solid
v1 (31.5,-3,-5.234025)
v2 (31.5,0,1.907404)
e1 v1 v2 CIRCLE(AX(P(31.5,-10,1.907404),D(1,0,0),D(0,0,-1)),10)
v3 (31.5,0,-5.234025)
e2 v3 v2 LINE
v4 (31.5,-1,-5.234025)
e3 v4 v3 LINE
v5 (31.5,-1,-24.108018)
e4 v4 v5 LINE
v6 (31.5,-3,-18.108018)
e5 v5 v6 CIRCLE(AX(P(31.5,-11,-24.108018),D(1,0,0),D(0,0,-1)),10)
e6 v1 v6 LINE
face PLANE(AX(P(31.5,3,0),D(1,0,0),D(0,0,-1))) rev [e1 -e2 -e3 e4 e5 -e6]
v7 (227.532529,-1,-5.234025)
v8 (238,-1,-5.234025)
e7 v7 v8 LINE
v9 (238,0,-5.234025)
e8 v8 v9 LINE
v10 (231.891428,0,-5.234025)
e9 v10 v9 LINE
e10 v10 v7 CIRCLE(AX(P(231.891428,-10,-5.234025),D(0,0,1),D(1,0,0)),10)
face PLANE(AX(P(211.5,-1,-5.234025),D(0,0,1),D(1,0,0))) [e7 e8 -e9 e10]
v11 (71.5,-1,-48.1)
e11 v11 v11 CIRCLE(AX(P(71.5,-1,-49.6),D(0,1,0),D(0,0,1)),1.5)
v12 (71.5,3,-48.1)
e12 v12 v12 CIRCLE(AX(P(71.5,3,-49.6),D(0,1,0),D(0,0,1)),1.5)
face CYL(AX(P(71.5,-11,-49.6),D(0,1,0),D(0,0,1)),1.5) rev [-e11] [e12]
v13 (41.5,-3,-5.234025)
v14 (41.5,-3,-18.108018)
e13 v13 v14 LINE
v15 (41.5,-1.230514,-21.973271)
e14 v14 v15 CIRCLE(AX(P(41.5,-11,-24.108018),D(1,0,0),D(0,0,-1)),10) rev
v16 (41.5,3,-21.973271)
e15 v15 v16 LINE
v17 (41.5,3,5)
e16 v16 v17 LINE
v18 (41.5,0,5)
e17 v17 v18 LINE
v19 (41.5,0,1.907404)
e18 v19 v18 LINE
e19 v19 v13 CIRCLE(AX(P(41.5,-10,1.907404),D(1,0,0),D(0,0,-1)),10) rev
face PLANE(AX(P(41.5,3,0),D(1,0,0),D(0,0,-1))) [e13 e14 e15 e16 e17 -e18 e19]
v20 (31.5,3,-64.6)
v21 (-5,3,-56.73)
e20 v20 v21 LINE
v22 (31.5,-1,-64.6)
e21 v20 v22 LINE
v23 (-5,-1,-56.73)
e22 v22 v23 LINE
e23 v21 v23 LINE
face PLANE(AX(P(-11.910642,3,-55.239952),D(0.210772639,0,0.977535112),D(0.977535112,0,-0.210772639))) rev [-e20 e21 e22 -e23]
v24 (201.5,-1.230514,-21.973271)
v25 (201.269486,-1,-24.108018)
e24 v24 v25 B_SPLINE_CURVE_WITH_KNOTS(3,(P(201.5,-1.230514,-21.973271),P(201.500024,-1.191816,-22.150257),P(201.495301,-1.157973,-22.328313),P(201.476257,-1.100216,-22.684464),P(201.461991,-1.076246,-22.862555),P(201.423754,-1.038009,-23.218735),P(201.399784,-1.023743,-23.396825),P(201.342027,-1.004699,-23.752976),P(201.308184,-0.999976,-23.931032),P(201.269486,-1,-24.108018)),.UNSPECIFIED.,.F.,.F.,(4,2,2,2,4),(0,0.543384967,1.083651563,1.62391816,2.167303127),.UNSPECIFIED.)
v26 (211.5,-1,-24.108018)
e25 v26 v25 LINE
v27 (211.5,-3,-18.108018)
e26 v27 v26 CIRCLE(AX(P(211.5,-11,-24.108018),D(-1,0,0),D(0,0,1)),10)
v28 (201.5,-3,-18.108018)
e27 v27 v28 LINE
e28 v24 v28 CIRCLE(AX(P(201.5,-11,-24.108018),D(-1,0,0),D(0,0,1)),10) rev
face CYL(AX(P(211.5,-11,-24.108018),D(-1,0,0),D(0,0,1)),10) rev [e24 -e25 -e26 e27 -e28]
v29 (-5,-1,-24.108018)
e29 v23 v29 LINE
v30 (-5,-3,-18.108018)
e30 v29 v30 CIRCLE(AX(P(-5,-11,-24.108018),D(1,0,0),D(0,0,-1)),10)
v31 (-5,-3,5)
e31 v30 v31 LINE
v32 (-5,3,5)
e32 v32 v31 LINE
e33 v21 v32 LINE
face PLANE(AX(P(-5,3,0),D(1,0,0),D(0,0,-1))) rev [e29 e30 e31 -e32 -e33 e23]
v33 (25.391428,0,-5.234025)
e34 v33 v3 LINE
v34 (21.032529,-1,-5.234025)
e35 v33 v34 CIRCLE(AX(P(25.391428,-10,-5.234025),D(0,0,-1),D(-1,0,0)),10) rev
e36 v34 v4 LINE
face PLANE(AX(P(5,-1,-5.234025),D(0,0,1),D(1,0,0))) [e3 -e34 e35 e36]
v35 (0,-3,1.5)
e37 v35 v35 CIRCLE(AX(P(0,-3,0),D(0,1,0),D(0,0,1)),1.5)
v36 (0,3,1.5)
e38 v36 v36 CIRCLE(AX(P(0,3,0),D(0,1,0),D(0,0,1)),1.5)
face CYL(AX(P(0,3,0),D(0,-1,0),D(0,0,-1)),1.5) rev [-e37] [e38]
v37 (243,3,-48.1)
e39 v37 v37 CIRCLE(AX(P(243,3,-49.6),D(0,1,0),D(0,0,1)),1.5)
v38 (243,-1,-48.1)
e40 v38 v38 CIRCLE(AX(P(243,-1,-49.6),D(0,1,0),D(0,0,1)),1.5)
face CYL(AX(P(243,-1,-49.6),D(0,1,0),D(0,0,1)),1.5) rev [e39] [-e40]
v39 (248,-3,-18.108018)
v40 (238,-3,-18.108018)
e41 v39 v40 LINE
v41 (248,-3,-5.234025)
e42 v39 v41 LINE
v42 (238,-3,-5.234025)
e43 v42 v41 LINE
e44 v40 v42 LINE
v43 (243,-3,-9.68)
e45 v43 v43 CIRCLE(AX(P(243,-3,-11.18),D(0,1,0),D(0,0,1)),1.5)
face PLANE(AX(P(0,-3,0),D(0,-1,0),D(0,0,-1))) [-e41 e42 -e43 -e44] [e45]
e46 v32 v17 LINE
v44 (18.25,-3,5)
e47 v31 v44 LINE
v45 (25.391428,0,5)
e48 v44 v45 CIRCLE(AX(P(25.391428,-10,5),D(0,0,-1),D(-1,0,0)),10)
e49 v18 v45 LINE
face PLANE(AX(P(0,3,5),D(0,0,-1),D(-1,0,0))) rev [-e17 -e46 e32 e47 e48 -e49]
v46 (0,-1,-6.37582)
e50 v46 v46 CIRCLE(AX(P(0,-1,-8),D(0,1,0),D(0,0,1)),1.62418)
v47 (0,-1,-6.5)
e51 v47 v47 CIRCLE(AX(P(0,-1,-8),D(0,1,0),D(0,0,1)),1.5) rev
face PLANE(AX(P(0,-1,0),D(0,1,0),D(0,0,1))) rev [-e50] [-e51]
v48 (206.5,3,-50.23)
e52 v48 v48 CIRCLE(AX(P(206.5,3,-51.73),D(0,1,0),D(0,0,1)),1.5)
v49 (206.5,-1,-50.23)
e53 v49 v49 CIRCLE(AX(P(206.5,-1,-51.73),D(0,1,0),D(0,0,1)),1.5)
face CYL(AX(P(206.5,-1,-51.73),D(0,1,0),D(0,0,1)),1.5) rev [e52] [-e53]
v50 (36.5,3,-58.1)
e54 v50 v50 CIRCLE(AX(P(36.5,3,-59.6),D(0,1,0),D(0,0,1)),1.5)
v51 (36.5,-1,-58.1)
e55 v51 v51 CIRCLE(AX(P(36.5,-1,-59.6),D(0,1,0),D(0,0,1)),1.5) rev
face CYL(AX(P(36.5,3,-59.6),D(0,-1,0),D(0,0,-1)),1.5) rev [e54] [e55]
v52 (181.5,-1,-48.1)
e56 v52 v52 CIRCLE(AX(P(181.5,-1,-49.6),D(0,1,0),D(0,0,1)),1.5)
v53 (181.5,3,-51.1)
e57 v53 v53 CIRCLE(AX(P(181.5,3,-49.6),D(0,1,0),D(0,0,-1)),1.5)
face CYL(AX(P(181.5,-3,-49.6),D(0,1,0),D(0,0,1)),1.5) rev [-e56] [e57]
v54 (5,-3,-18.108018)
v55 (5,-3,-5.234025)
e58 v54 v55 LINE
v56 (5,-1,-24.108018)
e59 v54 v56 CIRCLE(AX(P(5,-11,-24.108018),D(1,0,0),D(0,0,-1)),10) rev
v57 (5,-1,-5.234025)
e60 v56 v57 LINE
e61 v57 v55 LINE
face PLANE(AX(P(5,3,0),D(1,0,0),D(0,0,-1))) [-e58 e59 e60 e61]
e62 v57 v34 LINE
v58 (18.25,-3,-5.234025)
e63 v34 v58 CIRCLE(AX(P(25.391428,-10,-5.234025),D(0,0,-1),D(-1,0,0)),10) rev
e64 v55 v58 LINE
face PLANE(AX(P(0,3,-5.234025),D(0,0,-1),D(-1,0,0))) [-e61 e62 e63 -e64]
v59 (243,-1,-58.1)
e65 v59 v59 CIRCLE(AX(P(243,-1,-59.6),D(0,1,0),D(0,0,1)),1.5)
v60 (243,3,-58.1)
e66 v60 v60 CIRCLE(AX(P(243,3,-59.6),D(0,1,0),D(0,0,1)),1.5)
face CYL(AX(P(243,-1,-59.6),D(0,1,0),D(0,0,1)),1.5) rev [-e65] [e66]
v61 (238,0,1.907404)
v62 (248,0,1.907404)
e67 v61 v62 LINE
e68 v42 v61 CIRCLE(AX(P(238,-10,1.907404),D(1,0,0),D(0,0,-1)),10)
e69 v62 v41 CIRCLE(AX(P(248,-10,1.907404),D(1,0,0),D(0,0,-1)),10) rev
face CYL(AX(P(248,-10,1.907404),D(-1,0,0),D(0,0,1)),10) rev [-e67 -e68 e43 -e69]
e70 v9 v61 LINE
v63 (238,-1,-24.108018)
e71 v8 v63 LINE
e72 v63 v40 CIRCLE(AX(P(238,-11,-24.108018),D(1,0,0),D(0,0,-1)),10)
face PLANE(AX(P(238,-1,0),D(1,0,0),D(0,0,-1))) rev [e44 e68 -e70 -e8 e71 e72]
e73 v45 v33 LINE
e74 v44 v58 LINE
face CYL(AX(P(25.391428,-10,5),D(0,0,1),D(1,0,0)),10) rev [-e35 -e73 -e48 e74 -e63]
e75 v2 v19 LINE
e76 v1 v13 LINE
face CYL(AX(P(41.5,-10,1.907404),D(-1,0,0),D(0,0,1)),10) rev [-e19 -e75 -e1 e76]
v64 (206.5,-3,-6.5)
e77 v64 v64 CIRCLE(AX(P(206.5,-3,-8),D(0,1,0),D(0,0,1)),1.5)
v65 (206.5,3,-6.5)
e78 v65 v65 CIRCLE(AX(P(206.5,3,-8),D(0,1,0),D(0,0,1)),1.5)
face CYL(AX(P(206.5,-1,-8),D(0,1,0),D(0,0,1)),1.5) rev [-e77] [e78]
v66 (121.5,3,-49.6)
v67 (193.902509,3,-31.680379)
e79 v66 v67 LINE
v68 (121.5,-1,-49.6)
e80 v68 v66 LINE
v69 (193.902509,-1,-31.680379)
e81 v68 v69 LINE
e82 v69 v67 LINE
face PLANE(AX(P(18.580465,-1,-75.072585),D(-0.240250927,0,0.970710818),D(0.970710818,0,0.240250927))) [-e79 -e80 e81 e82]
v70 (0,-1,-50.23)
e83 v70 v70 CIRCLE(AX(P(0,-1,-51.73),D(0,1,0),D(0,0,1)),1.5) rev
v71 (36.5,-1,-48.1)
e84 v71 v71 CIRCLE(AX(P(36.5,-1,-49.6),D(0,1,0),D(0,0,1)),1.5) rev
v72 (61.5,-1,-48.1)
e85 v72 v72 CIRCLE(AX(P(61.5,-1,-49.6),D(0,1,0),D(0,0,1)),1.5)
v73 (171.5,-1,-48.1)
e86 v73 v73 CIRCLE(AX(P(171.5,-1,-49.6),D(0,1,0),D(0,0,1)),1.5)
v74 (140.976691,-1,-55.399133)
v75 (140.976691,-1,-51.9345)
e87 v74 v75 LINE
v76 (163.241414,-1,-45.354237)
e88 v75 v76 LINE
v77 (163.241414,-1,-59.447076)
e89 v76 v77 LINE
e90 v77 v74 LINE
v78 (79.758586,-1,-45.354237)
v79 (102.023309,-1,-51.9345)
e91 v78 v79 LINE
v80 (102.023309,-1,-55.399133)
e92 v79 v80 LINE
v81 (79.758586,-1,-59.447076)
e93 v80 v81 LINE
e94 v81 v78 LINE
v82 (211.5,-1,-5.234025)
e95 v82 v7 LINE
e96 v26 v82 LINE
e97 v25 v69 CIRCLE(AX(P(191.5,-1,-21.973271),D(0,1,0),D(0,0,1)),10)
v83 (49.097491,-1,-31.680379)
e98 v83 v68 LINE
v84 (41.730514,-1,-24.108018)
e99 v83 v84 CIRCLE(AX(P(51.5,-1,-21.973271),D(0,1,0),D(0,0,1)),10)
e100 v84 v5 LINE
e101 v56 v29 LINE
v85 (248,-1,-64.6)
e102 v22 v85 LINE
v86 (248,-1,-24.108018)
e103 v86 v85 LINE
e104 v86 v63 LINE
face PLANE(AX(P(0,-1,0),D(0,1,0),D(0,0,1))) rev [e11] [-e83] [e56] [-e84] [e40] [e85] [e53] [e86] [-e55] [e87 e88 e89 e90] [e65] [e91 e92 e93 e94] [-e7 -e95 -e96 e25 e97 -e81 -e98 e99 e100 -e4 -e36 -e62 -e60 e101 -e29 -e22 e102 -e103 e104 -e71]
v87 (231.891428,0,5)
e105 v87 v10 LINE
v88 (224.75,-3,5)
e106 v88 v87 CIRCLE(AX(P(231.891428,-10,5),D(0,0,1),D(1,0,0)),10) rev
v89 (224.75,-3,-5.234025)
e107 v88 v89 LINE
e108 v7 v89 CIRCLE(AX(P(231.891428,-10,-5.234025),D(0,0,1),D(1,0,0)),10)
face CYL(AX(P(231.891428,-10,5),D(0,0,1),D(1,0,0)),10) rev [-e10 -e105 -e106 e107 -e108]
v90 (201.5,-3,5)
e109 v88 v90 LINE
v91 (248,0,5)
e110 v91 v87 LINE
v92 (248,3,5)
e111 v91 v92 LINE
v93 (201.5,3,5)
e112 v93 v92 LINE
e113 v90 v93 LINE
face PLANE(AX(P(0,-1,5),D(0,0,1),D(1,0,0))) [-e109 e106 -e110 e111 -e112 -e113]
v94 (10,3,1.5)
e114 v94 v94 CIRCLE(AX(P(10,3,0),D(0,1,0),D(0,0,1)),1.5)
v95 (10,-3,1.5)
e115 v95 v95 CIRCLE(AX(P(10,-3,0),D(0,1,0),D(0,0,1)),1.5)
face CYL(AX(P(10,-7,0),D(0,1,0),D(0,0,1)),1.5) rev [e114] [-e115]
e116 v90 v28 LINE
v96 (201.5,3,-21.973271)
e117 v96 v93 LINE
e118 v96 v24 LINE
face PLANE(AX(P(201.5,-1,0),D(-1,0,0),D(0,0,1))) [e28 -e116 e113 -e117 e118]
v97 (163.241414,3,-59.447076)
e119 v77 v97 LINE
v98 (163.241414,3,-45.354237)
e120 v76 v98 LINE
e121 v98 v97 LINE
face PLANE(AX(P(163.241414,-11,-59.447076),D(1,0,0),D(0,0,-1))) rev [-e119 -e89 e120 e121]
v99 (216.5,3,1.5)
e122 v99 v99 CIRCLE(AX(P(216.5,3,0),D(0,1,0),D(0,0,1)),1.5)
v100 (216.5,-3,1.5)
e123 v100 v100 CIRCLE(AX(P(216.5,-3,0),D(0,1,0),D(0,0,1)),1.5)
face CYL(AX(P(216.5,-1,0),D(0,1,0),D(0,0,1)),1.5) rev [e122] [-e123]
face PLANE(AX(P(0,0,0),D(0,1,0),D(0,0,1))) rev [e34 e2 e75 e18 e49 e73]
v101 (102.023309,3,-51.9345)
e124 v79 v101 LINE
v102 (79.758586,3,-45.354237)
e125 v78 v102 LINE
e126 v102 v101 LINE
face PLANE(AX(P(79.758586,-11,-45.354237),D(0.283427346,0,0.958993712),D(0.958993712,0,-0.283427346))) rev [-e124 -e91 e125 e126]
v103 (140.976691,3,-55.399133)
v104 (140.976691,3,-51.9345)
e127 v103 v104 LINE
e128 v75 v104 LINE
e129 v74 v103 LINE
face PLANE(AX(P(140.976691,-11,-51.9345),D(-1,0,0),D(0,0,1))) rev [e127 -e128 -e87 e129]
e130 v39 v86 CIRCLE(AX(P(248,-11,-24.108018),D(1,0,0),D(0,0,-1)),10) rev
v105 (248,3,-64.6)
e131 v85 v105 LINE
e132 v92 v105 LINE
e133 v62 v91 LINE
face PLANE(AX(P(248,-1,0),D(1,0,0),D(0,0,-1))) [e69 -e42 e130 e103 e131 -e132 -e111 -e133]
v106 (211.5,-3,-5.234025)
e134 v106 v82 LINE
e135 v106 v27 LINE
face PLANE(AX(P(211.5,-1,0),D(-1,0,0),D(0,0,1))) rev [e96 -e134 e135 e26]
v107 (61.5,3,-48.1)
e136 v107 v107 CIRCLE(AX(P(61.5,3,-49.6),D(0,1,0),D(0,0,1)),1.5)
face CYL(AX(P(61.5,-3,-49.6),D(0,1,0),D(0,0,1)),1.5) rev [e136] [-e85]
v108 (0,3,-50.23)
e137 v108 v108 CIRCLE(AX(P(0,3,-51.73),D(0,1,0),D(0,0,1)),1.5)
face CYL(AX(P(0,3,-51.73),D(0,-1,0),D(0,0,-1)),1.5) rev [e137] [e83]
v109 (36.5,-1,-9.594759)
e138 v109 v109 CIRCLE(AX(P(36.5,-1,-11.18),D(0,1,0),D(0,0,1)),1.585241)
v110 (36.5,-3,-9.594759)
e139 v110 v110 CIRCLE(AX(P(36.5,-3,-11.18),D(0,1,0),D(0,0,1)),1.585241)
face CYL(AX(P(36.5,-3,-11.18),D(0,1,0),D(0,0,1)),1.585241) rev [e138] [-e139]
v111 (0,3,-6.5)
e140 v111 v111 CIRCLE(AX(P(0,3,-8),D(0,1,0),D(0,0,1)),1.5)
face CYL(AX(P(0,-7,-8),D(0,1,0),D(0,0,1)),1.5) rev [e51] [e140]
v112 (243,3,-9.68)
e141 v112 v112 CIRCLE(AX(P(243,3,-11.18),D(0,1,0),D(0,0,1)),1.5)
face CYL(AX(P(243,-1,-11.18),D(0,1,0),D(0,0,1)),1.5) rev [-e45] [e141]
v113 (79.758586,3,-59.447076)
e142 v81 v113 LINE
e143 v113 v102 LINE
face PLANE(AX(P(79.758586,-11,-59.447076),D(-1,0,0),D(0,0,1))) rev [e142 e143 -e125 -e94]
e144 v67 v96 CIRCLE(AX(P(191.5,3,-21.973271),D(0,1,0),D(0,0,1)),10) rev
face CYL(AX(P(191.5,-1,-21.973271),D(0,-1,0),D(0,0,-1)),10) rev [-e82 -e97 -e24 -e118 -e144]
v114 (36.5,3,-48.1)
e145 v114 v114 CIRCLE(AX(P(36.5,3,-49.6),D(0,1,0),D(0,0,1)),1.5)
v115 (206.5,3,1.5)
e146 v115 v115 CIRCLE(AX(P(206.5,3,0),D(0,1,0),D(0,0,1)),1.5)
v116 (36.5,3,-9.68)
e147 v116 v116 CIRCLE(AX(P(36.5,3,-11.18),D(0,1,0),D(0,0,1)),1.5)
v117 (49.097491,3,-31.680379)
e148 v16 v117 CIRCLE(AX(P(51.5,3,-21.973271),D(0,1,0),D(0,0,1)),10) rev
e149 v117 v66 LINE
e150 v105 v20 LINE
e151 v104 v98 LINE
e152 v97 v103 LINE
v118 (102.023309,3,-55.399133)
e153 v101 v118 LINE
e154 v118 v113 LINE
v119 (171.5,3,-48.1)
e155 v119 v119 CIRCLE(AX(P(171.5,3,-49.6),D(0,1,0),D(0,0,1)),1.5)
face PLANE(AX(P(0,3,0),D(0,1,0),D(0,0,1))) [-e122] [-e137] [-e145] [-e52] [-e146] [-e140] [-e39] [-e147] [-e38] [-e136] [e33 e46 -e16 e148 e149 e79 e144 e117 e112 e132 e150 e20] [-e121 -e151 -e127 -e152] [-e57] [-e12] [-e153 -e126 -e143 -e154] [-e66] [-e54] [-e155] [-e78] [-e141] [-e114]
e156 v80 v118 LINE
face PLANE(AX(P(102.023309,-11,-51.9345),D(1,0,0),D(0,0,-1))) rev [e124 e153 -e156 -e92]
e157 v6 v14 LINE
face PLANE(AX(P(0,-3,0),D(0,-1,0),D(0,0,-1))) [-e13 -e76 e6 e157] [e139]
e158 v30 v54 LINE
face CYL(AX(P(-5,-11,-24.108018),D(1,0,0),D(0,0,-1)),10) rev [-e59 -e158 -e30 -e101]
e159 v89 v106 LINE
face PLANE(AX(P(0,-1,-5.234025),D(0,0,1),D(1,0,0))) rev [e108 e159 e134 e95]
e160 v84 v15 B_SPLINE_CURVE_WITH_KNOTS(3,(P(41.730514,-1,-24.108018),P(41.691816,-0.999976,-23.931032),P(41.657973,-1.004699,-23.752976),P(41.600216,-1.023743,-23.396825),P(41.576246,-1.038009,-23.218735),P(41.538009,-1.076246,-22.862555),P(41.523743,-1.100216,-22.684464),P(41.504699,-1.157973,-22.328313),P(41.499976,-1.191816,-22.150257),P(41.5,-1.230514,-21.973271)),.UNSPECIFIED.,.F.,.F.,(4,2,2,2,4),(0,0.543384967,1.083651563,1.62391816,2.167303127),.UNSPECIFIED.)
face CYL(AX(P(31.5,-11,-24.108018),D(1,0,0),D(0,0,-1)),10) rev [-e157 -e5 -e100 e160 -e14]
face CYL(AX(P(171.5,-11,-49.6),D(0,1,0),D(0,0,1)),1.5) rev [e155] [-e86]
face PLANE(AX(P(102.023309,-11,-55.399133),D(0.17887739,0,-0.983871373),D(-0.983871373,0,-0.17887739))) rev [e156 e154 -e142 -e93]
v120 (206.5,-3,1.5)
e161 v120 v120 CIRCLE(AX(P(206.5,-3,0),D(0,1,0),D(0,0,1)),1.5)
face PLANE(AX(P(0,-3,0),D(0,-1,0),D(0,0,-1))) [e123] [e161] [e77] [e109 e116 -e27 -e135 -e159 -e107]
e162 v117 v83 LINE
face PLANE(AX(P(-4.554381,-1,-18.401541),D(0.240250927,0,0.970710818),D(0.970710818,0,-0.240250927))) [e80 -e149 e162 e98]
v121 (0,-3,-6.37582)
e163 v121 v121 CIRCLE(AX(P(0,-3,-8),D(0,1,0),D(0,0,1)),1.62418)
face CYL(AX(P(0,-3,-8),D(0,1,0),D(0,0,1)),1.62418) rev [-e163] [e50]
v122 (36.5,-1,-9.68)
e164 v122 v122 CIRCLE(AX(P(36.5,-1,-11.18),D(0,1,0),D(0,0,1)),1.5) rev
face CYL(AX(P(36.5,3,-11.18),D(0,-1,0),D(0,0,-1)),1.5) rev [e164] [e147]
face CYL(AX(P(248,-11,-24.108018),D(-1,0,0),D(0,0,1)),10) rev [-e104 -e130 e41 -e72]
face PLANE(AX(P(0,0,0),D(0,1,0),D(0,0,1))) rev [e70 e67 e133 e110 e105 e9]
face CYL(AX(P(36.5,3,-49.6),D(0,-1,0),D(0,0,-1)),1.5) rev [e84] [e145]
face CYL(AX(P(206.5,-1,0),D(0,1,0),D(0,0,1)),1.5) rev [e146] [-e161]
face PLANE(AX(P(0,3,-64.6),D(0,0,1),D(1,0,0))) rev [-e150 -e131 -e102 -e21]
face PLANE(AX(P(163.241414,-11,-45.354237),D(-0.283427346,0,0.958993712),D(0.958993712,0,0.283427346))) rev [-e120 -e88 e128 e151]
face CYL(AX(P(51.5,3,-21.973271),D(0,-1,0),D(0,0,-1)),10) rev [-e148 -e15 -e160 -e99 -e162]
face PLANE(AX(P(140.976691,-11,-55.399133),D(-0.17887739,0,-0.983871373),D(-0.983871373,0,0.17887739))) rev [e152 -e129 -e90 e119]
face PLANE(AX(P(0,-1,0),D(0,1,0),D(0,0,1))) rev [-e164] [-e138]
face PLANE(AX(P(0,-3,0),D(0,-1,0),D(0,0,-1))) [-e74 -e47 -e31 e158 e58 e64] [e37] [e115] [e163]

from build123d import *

# Parameters (mm, degrees)
SKETCH1_R           = 1.5
BOSS_EXTRUDE1_DEPTH = 3
SKETCH2_W           = 26.5
SKETCH2_H           = 13.12704922
BOSS_EXTRUDE2_DEPTH = 3
SKETCH3_R           = 1.5
CUT_EXTRUDE1_DEPTH  = 10
SKETCH4_R           = 1.5
CUT_EXTRUDE2_DEPTH  = 10
BOSS_EXTRUDE4_START = -4
SKETCH6_R           = 1.5
SKETCH6_W           = 26.5
SKETCH6_H           = 25.74798773
BOSS_EXTRUDE4_DEPTH = 4
SKETCH9_R           = 1.5
CUT_EXTRUDE3_DEPTH  = 6
CUT_EXTRUDE4_DEPTH  = 14
SKETCH11_R          = 1.5
CUT_EXTRUDE5_DEPTH  = 14
SKETCH12_W          = 9.439157555
SKETCH12_H          = 13.291874924
CUT_EXTRUDE6_DEPTH  = 10
BOSS_EXTRUDE5_START = -6
SKETCH14_R          = 1.5
SKETCH14_R_2        = 1.624180029
SKETCH14_W          = 10
SKETCH14_H          = 12.873993865
SKETCH14_R_3        = 1.585240738
BOSS_EXTRUDE5_DEPTH = 6
SKETCH15_W          = 23.25
SKETCH15_H          = 10.234024539
CUT_EXTRUDE7_DEPTH  = 3
FILLET2_R           = 10
FILLET4_R           = 10
SKETCH16_W          = 26.5
SKETCH16_H          = 25.74798773
SKETCH16_H_2        = 10.370938511
SKETCH16_W_2        = 9.439157555
SKETCH16_H_3        = 13.291874924
BOSS_EXTRUDE6_DEPTH = 4
FILLET5_R           = 10


with BuildPart() as part:
    # Sketch1 → Boss-Extrude1 (new body)
    with BuildSketch(Plane(origin=(0, 0, 0), x_dir=(1, 0, 0), z_dir=(0, 1, 0))):
        Polygon((-5, -5), (41.5, -5), (41.5, 64.6), (31.5, 64.6), (-5, 56.73), align=None)
        Polygon((31.5, 54.48), (31.5, 5.234024539), (5, 5.234024539), (5, 56.73), align=None, mode=Mode.SUBTRACT)
        with Locations(Location((0, 0, 0), (0, 0, 270))):
            Circle(SKETCH1_R, mode=Mode.SUBTRACT)
        with Locations(Location((0, 51.73, 0), (0, 0, 270))):
            Circle(SKETCH1_R, mode=Mode.SUBTRACT)
        with Locations(Location((36.5, 59.6, 0), (0, 0, 270))):
            Circle(SKETCH1_R, mode=Mode.SUBTRACT)
        with Locations(Location((36.5, 11.18, 0), (0, 0, 270))):
            Circle(SKETCH1_R, mode=Mode.SUBTRACT)
        with Locations(Location((36.5, 49.6, 0), (0, 0, 270))):
            Circle(SKETCH1_R, mode=Mode.SUBTRACT)
    extrude(amount=BOSS_EXTRUDE1_DEPTH)

    # Sketch2 → Boss-Extrude2 (add)
    with BuildSketch(Plane(origin=(0, 3, 0), x_dir=(1, 0, 0), z_dir=(0, 1, 0))):
        with Locations((18.25, 37.545536879)):
            Rectangle(SKETCH2_W, SKETCH2_H)
        Polygon((5, 56.73), (5, 49.867078553), (31.5, 54.48), align=None)
    extrude(amount=-BOSS_EXTRUDE2_DEPTH)

    # Sketch3 → Cut-Extrude1 (cut)
    with BuildSketch(Plane(origin=(0, 3, 0), x_dir=(1, 0, 0), z_dir=(0, 1, 0))):
        with Locations(Location((10, 0, 0), (0, 0, 270))):
            Circle(SKETCH3_R)
    extrude(amount=-CUT_EXTRUDE1_DEPTH, mode=Mode.SUBTRACT)

    # Sketch4 → Cut-Extrude2 (cut)
    with BuildSketch(Plane(origin=(0, 3, 0), x_dir=(1, 0, 0), z_dir=(0, 1, 0))):
        with Locations(Location((0, 8, 0), (0, 0, 270))):
            Circle(SKETCH4_R)
    extrude(amount=-CUT_EXTRUDE2_DEPTH, mode=Mode.SUBTRACT)

    # Sketch6 → Boss-Extrude4 (add)
    # profile 1 of 3: a face of its own
    with BuildSketch(Plane(origin=(0, 3, 0), x_dir=(1, 0, 0), z_dir=(0, 1, 0)).offset(BOSS_EXTRUDE4_START)):
        Polygon((238, 64.6), (41.5, 64.6), (41.5, 29.8), (121.5, 49.6), (201.5, 29.8), (201.5, 56.73), align=None)
    # profile 2 of 3: a face of its own
    with BuildSketch(Plane(origin=(0, 3, 0), x_dir=(1, 0, 0), z_dir=(0, 1, 0)).offset(BOSS_EXTRUDE4_START)):
        Polygon((31.5, 64.6), (-5, 56.73), (-5, -5), (41.5, -5), (41.5, 29.8), (41.5, 64.6), align=None)
        with Locations(Location((0, 0, 0), (0, 0, 270))):
            Circle(SKETCH6_R, mode=Mode.SUBTRACT)
        with Locations(Location((10, 0, 0), (0, 0, 270))):
            Circle(SKETCH6_R, mode=Mode.SUBTRACT)
        with Locations(Location((0, 8, 0), (0, 0, 270))):
            Circle(SKETCH6_R, mode=Mode.SUBTRACT)
        with Locations(Location((36.5, 11.18, 0), (0, 0, 270))):
            Circle(SKETCH6_R, mode=Mode.SUBTRACT)
        with Locations((18.25, 18.108018404)):
            Rectangle(SKETCH6_W, SKETCH6_H, mode=Mode.SUBTRACT)
        Polygon((31.5, 44.109061489), (5, 44.109061489), (5, 49.867078553), (31.5, 54.48), align=None, mode=Mode.SUBTRACT)
        with Locations(Location((0, 51.73, 0), (0, 0, 270))):
            Circle(SKETCH6_R, mode=Mode.SUBTRACT)
        with Locations(Location((36.5, 49.6, 0), (0, 0, 270))):
            Circle(SKETCH6_R, mode=Mode.SUBTRACT)
        with Locations(Location((36.5, 59.6, 0), (0, 0, 270))):
            Circle(SKETCH6_R, mode=Mode.SUBTRACT)
    # profile 3 of 3: a face of its own
    with BuildSketch(Plane(origin=(0, 3, 0), x_dir=(1, 0, 0), z_dir=(0, 1, 0)).offset(BOSS_EXTRUDE4_START)):
        Polygon((248, 64.6), (238, 64.6), (201.5, 56.73), (201.5, -5), (248, -5), align=None)
        with Locations(Location((206.5, 8, 0), (0, 0, 270))):
            Circle(SKETCH6_R, mode=Mode.SUBTRACT)
        with Locations(Location((206.5, 0, 0), (0, 0, 270))):
            Circle(SKETCH6_R, mode=Mode.SUBTRACT)
        with Locations(Location((216.5, 0, 0), (0, 0, 270))):
            Circle(SKETCH6_R, mode=Mode.SUBTRACT)
        with Locations(Location((243, 11.18, 0), (0, 0, 270))):
            Circle(SKETCH6_R, mode=Mode.SUBTRACT)
        with Locations(Location((243, 49.6, 0), (0, 0, 270))):
            Circle(SKETCH6_R, mode=Mode.SUBTRACT)
        with Locations(Location((243, 59.6, 0), (0, 0, 270))):
            Circle(SKETCH6_R, mode=Mode.SUBTRACT)
        with Locations(Location((206.5, 51.73, 0), (0, 0, 270))):
            Circle(SKETCH6_R, mode=Mode.SUBTRACT)
        with Locations((224.75, 18.108018404)):
            Rectangle(SKETCH6_W, SKETCH6_H, mode=Mode.SUBTRACT)
        Polygon((238, 54.48), (238, 44.109061489), (211.5, 44.109061489), (211.5, 49.867078553), align=None, mode=Mode.SUBTRACT)
    extrude(amount=BOSS_EXTRUDE4_DEPTH)

    # Sketch9 → Cut-Extrude3 (cut)
    with BuildSketch(Plane(origin=(0, 3, 0), x_dir=(1, 0, 0), z_dir=(0, 1, 0))):
        with Locations(Location((61.5, 49.6, 0), (0, 0, 270))):
            Circle(SKETCH9_R)
        with Locations(Location((181.5, 49.6, 0), (0, 0, 270))):
            Circle(SKETCH9_R)
    extrude(amount=-CUT_EXTRUDE3_DEPTH, mode=Mode.SUBTRACT)

    # Sketch10 → Cut-Extrude4 (cut)
    with BuildSketch(Plane(origin=(0, 3, 0), x_dir=(1, 0, 0), z_dir=(0, 1, 0))):
        Polygon((79.758586054, 59.447076053), (79.758586054, 45.354236602), (102.023308671, 51.934500024), (102.023308671, 55.399132807), align=None)
        Polygon((140.976691329, 51.934500024), (140.976691329, 55.399132807), (163.241413946, 59.447076053), (163.241413946, 45.354236602), align=None)
    extrude(amount=-CUT_EXTRUDE4_DEPTH, mode=Mode.SUBTRACT)

    # Sketch11 → Cut-Extrude5 (cut)
    with BuildSketch(Plane(origin=(0, 3, 0), x_dir=(1, 0, 0), z_dir=(0, 1, 0))):
        with Locations(Location((71.5, 49.6, 0), (0, 0, 270))):
            Circle(SKETCH11_R)
        with Locations(Location((171.5, 49.6, 0), (0, 0, 270))):
            Circle(SKETCH11_R)
    extrude(amount=-CUT_EXTRUDE5_DEPTH, mode=Mode.SUBTRACT)

    # Sketch12 → Cut-Extrude6 (cut)
    with BuildSketch(Plane(origin=(0, 3, 0), x_dir=(1, 0, 0), z_dir=(0, 1, 0))):
        with Locations((193.819806215, 48.516488721)):
            Rectangle(SKETCH12_W, SKETCH12_H)
        with Locations((49.180193786, 48.516488721)):
            Rectangle(SKETCH12_W, SKETCH12_H)
    extrude(amount=-CUT_EXTRUDE6_DEPTH, mode=Mode.SUBTRACT)

    # Sketch14 → Boss-Extrude5 (add)
    # profile 1 of 6: a face of its own
    with BuildSketch(Plane(origin=(0, 3, 0), x_dir=(1, 0, 0), z_dir=(0, 1, 0)).offset(BOSS_EXTRUDE5_START)):
        Polygon((5, 18.108018404), (-5, 18.108018404), (-5, -5), (5, -5), (18.25, -5), (18.25, 5.234024539), (5, 5.234024539), align=None)
        with Locations(Location((0, 0, 0), (0, 0, 270))):
            Circle(SKETCH14_R, mode=Mode.SUBTRACT)
        with Locations(Location((10, 0, 0), (0, 0, 270))):
            Circle(SKETCH14_R, mode=Mode.SUBTRACT)
        with Locations(Location((0, 8, 0), (0, 0, 270))):
            Circle(SKETCH14_R_2, mode=Mode.SUBTRACT)
    # profile 2 of 6: a face of its own
    with BuildSketch(Plane(origin=(0, 3, 0), x_dir=(1, 0, 0), z_dir=(0, 1, 0)).offset(BOSS_EXTRUDE5_START)):
        Polygon((31.5, 5.234024539), (18.25, 5.234024539), (18.25, -5), (31.5, -5), (41.5, -5), (41.5, 5.234024539), align=None)
    # profile 3 of 6: a face of its own
    with BuildSketch(Plane(origin=(0, 3, 0), x_dir=(1, 0, 0), z_dir=(0, 1, 0)).offset(BOSS_EXTRUDE5_START)):
        with Locations((36.5, 11.671021472)):
            Rectangle(SKETCH14_W, SKETCH14_H)
        with Locations(Location((36.5, 11.18, 0), (0, 0, 270))):
            Circle(SKETCH14_R_3, mode=Mode.SUBTRACT)
    # profile 4 of 6: a face of its own
    with BuildSketch(Plane(origin=(0, 3, 0), x_dir=(1, 0, 0), z_dir=(0, 1, 0)).offset(BOSS_EXTRUDE5_START)):
        with Locations((243, 11.671021472)):
            Rectangle(SKETCH14_W, SKETCH14_H)
        with Locations(Location((243, 11.18, 0), (0, 0, 270))):
            Circle(SKETCH14_R, mode=Mode.SUBTRACT)
    # profile 5 of 6: a face of its own
    with BuildSketch(Plane(origin=(0, 3, 0), x_dir=(1, 0, 0), z_dir=(0, 1, 0)).offset(BOSS_EXTRUDE5_START)):
        Polygon((248, -5), (248, 5.234024539), (238, 5.234024539), (224.75, 5.234024539), (224.75, -5), (238, -5), align=None)
    # profile 6 of 6: a face of its own
    with BuildSketch(Plane(origin=(0, 3, 0), x_dir=(1, 0, 0), z_dir=(0, 1, 0)).offset(BOSS_EXTRUDE5_START)):
        Polygon((224.75, -5), (224.75, 5.234024539), (211.5, 5.234024539), (211.5, 18.108018404), (201.5, 18.108018404), (201.5, -5), (211.5, -5), align=None)
        with Locations(Location((206.5, 0, 0), (0, 0, 270))):
            Circle(SKETCH14_R, mode=Mode.SUBTRACT)
        with Locations(Location((216.5, 0, 0), (0, 0, 270))):
            Circle(SKETCH14_R, mode=Mode.SUBTRACT)
        with Locations(Location((206.5, 8, 0), (0, 0, 270))):
            Circle(SKETCH14_R, mode=Mode.SUBTRACT)
    extrude(amount=BOSS_EXTRUDE5_DEPTH)

    # Sketch15 → Cut-Extrude7 (cut)
    with BuildSketch(Plane(origin=(0, -3, 0), x_dir=(-1, 0, 0), z_dir=(0, -1, 0))):
        with Locations((-29.875, 0.117012269)):
            Rectangle(SKETCH15_W, SKETCH15_H)
        with Locations((-236.375, 0.117012269)):
            Rectangle(SKETCH15_W, SKETCH15_H)
    extrude(amount=-CUT_EXTRUDE7_DEPTH, mode=Mode.SUBTRACT)

    # Fillet2
    # the kernel refuses this fillet: 10 mm, written as the material it adds along each edge
    with BuildSketch(Plane(origin=(224.75, 0, 5), x_dir=(1, 0, 0), z_dir=(0, 0, -1)), Plane(origin=(18.25, 0, 5), x_dir=(1, 0, 0), z_dir=(0, 0, -1))) as fillet2_piece_1:
        with BuildLine():
            CenterArc((7.141428429, 10), FILLET2_R, 224.427004001, 45.572995999)
            Line((0, 3), (0, 0))
            Line((0, 0), (7.141428429, 0))
        make_face()
    extrude(amount=10.234024539)
    with BuildSketch(Plane(origin=(238, 0, -5.234024539), x_dir=(0, -1, 0), z_dir=(1, 0, 0)), Plane(origin=(31.5, 0, -5.234024539), x_dir=(0, -1, 0), z_dir=(1, 0, 0))) as fillet2_piece_2:
        with BuildLine():
            CenterArc((10, -7.141428429), FILLET2_R, 134.427004001, 45.572995999)
            Line((0, -7.141428429), (0, 0))
            Line((0, 0), (3, 0))
        make_face()
    extrude(amount=10)

    # Fillet4
    # the kernel refuses this fillet: 10 mm, written as the material it adds along each edge
    with BuildSketch(Plane(origin=(238, -1, -18.108018404), x_dir=(0, -1, 0), z_dir=(1, 0, 0))) as fillet4_piece_1:
        with BuildLine():
            CenterArc((10, 6), FILLET4_R, 180, 36.869897646)
            Line((0, 6), (-0.2, 6))
            Line((-0.2, 6), (-0.2, 0))
            Line((-0.2, 0), (0, -0.2))
            ThreePointArc((0, -0.2), (1, -0.2), (1.84, -0.12))
            Line((1.84, -0.12), (2, 0))
        make_face()
    extrude(amount=10)
    with BuildSketch(Plane(origin=(201.5, -1, -18.108018404), x_dir=(0, 0, -1), z_dir=(1, 0, 0)), Plane(origin=(31.5, -1, -18.108018404), x_dir=(0, 0, -1), z_dir=(1, 0, 0)), Plane(origin=(-5, -1, -18.108018404), x_dir=(0, 0, -1), z_dir=(1, 0, 0))) as fillet4_piece_2:
        with BuildLine():
            CenterArc((6, -10), FILLET4_R, 90, 36.869897646)
            Line((0, -2), (-0.12, -1.84))
            ThreePointArc((-0.12, -1.84), (-0.2, -1), (-0.2, 0))
            Line((-0.2, 0), (0, 0.2))
            Line((0, 0.2), (6, 0.2))
            Line((6, 0.2), (6, 0))
        make_face()
    extrude(amount=10)

    # Sketch16 → Boss-Extrude6 (add)
    with BuildSketch(Plane(origin=(0, 3, 0), x_dir=(1, 0, 0), z_dir=(0, 1, 0))):
        with Locations((18.25, 18.108018404)):
            Rectangle(SKETCH16_W, SKETCH16_H)
        with Locations((224.75, 18.108018404)):
            Rectangle(SKETCH16_W, SKETCH16_H)
        with Locations((18.25, 49.294530745)):
            Rectangle(SKETCH16_W, SKETCH16_H_2)
        with Locations((224.75, 49.294530745)):
            Rectangle(SKETCH16_W, SKETCH16_H_2)
        with Locations((49.180193786, 48.516488721)):
            Rectangle(SKETCH16_W_2, SKETCH16_H_3)
        with Locations((193.819806215, 48.516488721)):
            Rectangle(SKETCH16_W_2, SKETCH16_H_3)
    extrude(amount=-BOSS_EXTRUDE6_DEPTH)

    # Fillet5
    fillet5_edges = [part.edges().sort_by_distance(p)[0] for p in [
        (41.5, 1, -29.8),
        (201.5, 1, -29.8),
    ]]
    fillet(fillet5_edges, radius=FILLET5_R)


solid = part.part
